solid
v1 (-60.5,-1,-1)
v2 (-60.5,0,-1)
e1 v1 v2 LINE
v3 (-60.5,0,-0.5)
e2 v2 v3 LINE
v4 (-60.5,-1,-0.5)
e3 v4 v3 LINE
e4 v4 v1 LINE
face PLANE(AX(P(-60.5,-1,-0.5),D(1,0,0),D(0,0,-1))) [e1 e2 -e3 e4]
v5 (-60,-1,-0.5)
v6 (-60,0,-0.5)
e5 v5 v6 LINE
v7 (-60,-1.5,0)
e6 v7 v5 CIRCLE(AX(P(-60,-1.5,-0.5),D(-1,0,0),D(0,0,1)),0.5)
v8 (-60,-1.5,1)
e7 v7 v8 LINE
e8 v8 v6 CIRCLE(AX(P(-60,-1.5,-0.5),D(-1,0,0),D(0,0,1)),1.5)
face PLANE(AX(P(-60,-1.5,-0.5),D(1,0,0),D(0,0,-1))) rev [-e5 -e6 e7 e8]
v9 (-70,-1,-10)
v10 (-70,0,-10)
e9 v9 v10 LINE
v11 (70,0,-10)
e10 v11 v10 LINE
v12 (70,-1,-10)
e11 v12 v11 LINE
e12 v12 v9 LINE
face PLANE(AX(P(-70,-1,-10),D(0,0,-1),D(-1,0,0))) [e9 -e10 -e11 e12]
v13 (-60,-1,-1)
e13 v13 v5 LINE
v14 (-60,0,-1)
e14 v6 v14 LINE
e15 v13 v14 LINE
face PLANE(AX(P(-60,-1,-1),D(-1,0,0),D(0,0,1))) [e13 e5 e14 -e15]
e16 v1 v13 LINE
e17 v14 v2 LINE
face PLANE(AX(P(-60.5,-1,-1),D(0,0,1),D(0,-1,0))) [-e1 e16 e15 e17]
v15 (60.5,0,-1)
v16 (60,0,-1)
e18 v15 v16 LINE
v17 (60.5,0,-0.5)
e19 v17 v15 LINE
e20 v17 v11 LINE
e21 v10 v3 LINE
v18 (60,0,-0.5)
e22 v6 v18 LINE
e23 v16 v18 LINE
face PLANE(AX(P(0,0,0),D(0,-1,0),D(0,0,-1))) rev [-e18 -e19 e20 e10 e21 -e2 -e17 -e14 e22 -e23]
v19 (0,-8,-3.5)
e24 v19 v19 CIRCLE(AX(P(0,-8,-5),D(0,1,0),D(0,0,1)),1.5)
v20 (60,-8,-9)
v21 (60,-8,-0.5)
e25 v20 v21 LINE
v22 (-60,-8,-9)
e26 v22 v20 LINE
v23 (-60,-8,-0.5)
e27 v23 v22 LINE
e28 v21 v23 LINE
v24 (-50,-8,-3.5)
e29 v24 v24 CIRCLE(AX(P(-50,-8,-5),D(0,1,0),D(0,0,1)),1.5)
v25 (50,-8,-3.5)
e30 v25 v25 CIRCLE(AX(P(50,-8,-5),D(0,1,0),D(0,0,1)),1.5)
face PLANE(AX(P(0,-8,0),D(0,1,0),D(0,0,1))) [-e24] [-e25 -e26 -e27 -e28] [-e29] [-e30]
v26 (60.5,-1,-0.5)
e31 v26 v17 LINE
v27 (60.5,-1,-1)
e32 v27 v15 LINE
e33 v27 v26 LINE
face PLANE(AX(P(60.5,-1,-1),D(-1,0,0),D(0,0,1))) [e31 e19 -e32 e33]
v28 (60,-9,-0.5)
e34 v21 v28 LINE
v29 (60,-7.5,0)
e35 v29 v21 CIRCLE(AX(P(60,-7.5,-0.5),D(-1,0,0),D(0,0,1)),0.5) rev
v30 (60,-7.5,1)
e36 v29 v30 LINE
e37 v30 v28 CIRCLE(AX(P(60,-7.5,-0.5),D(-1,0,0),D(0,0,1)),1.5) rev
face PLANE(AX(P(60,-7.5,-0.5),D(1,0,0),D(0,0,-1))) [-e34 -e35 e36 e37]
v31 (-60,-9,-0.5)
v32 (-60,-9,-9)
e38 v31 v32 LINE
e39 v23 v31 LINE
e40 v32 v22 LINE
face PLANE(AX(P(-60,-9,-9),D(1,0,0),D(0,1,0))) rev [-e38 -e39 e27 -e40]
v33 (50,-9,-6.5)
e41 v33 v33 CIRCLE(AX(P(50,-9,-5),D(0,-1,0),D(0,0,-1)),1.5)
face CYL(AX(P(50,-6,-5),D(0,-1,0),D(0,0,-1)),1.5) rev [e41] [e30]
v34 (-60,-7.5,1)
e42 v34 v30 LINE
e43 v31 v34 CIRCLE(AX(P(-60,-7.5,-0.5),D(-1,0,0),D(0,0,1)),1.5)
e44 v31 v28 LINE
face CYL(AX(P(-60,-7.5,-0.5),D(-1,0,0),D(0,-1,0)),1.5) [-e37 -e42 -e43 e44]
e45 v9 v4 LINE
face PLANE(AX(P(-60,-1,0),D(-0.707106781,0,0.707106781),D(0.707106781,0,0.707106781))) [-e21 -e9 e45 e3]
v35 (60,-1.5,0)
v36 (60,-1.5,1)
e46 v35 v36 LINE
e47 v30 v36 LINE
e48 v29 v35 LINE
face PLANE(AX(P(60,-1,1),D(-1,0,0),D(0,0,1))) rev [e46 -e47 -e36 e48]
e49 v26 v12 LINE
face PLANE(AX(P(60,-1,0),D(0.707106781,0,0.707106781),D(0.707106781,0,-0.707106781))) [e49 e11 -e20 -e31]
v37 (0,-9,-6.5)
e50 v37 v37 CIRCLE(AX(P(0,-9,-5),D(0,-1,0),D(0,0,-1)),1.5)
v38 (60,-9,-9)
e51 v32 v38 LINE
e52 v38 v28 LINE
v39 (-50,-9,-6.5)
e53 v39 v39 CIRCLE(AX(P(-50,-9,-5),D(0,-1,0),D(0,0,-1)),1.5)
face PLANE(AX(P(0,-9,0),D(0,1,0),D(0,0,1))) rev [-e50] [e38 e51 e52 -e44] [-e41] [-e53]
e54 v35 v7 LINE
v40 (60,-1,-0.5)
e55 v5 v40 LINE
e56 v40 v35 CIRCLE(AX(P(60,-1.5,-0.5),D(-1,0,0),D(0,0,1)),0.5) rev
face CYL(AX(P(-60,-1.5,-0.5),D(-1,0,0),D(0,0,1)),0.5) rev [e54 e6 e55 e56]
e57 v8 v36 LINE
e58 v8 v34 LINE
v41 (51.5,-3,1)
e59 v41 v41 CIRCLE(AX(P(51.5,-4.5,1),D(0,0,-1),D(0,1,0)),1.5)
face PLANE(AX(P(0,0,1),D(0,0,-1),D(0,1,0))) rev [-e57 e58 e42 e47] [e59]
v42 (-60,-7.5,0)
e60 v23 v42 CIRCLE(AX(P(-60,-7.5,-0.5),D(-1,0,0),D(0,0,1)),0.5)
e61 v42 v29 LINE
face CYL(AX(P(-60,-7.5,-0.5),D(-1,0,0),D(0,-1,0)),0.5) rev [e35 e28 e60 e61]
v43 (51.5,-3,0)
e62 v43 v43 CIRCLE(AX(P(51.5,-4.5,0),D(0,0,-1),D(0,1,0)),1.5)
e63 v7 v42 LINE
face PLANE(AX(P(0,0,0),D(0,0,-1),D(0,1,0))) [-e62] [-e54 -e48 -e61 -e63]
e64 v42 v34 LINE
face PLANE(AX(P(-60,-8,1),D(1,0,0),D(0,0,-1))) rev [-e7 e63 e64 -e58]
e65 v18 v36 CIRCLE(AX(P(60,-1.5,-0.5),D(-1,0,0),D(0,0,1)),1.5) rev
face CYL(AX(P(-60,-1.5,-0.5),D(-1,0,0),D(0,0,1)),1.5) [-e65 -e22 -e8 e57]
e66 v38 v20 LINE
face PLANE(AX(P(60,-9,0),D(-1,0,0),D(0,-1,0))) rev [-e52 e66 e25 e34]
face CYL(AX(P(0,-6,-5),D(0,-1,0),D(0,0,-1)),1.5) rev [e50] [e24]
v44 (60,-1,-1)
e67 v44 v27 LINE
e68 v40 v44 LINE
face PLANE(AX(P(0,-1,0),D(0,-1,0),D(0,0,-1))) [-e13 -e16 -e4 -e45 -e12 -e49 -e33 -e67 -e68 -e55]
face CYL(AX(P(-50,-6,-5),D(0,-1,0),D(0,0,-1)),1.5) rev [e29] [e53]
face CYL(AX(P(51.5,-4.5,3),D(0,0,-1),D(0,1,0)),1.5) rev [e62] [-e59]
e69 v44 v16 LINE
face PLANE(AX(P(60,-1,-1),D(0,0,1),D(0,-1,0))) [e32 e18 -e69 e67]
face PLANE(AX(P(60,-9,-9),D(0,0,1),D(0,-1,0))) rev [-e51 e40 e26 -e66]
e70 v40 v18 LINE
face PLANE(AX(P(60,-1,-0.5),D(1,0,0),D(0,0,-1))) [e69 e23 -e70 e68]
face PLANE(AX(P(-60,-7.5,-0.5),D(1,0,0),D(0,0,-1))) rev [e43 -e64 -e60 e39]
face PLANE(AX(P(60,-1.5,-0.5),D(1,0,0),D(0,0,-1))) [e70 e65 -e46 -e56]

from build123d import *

# Parameters (mm, degrees)
BASE_FLANGE1_DEPTH            = 1
EDGE_FLANGE1_STRIP_W          = 5
EDGE_FLANGE1_STRIP_H          = 1
EDGE_FLANGE1_STRIP_CUT_DEPTH  = 120
EDGE_FLANGE1_RELIEF_W         = 5.5
EDGE_FLANGE1_RELIEF_H         = 0.5
EDGE_FLANGE1_RELIEF_CUT_DEPTH = 1
EDGE_FLANGE1_DEPTH            = 120
EDGE_FLANGE2_STRIP_W          = 5
EDGE_FLANGE2_STRIP_H          = 1
EDGE_FLANGE2_STRIP_CUT_DEPTH  = 120
EDGE_FLANGE2_DEPTH            = 120
SKETCH12_R                    = 1.5
CUT_EXTRUDE1_DEPTH            = 3
SKETCH13_R                    = 1.5
CUT_EXTRUDE2_DEPTH            = 3


# Sheet-metal steps are written as plain solids
with BuildPart() as part:
    # Sketch1 → Base-Flange1 (new body)
    with BuildSketch(Plane(origin=(0, 0, 0), x_dir=(1, 0, 0), z_dir=(0, 1, 0))):
        Polygon((-60, 0), (60, 0), (70, 10), (-70, 10), align=None)
    extrude(amount=-BASE_FLANGE1_DEPTH)

    # Edge-Flange1 strip (across the edge) → Edge-Flange1 strip cut (cut)
    with BuildSketch(Plane(origin=(60, -1, 0), x_dir=(0, 0, -1), z_dir=(-1, 0, 0))):
        with Locations((-2, -0.5)):
            Rectangle(EDGE_FLANGE1_STRIP_W, EDGE_FLANGE1_STRIP_H)
    extrude(amount=EDGE_FLANGE1_STRIP_CUT_DEPTH, mode=Mode.SUBTRACT)

    # Edge-Flange1 relief (on the sheet) → Edge-Flange1 relief cut (cut)
    with BuildSketch(Plane(origin=(60, -1, -0.5), x_dir=(0, 0, -1), z_dir=(0, -1, 0))):
        with Locations((-2.25, 0.25)):
            Rectangle(EDGE_FLANGE1_RELIEF_W, EDGE_FLANGE1_RELIEF_H)
        with Locations((-2.25, -120.25)):
            Rectangle(EDGE_FLANGE1_RELIEF_W, EDGE_FLANGE1_RELIEF_H)
    extrude(amount=-EDGE_FLANGE1_RELIEF_CUT_DEPTH, mode=Mode.SUBTRACT)

    # Edge-Flange1 section (across the edge) → Edge-Flange1 (add)
    with BuildSketch(Plane(origin=(60, -1, 0), x_dir=(0, 0, -1), z_dir=(-1, 0, 0))):
        with BuildLine():
            Line((-1, 0.5), (-1, 7))
            Line((-1, 7), (0, 7))
            Line((0, 7), (0, 0.5))
            ThreePointArc((0, 0.5), (0.146446609, 0.146446609), (0.5, 0))
            Line((0.5, 0), (0.5, -1))
            ThreePointArc((0.5, -1), (-0.560660172, -0.560660172), (-1, 0.5))
        make_face()
    extrude(amount=EDGE_FLANGE1_DEPTH)

    # Edge-Flange2 strip (across the edge) → Edge-Flange2 strip cut (cut)
    with BuildSketch(Plane(origin=(60, -8, 0), x_dir=(0, 1, 0), z_dir=(-1, 0, 0))):
        with Locations((-2, -0.5)):
            Rectangle(EDGE_FLANGE2_STRIP_W, EDGE_FLANGE2_STRIP_H)
    extrude(amount=EDGE_FLANGE2_STRIP_CUT_DEPTH, mode=Mode.SUBTRACT)

    # Edge-Flange2 section (across the edge) → Edge-Flange2 (add)
    with BuildSketch(Plane(origin=(60, -8, 0), x_dir=(0, 1, 0), z_dir=(-1, 0, 0))):
        with BuildLine():
            Line((-1, 0.5), (-1, 9))
            Line((-1, 9), (0, 9))
            Line((0, 9), (0, 0.5))
            ThreePointArc((0, 0.5), (0.146446609, 0.146446609), (0.5, 0))
            Line((0.5, 0), (0.5, -1))
            ThreePointArc((0.5, -1), (-0.560660172, -0.560660172), (-1, 0.5))
        make_face()
    extrude(amount=EDGE_FLANGE2_DEPTH)

    # Sketch12 → Cut-Extrude1 (cut)
    with BuildSketch(Plane.XZ.offset(9)):
        with Locations(Location((-50, -5, 0), (0, 0, 270))):
            Circle(SKETCH12_R)
        with Locations(Location((0, -5, 0), (0, 0, 270))):
            Circle(SKETCH12_R)
        with Locations(Location((50, -5, 0), (0, 0, 270))):
            Circle(SKETCH12_R)
    extrude(amount=-CUT_EXTRUDE1_DEPTH, mode=Mode.SUBTRACT)

    # Sketch13 → Cut-Extrude2 (cut)
    with BuildSketch(Plane(origin=(0, 0, 0), x_dir=(-1, 0, 0), z_dir=(0, 0, -1))):
        with Locations(Location((-51.5, -4.5, 0), (0, 0, 90))):
            Circle(SKETCH13_R)
    extrude(amount=-CUT_EXTRUDE2_DEPTH, mode=Mode.SUBTRACT)


solid = part.part
